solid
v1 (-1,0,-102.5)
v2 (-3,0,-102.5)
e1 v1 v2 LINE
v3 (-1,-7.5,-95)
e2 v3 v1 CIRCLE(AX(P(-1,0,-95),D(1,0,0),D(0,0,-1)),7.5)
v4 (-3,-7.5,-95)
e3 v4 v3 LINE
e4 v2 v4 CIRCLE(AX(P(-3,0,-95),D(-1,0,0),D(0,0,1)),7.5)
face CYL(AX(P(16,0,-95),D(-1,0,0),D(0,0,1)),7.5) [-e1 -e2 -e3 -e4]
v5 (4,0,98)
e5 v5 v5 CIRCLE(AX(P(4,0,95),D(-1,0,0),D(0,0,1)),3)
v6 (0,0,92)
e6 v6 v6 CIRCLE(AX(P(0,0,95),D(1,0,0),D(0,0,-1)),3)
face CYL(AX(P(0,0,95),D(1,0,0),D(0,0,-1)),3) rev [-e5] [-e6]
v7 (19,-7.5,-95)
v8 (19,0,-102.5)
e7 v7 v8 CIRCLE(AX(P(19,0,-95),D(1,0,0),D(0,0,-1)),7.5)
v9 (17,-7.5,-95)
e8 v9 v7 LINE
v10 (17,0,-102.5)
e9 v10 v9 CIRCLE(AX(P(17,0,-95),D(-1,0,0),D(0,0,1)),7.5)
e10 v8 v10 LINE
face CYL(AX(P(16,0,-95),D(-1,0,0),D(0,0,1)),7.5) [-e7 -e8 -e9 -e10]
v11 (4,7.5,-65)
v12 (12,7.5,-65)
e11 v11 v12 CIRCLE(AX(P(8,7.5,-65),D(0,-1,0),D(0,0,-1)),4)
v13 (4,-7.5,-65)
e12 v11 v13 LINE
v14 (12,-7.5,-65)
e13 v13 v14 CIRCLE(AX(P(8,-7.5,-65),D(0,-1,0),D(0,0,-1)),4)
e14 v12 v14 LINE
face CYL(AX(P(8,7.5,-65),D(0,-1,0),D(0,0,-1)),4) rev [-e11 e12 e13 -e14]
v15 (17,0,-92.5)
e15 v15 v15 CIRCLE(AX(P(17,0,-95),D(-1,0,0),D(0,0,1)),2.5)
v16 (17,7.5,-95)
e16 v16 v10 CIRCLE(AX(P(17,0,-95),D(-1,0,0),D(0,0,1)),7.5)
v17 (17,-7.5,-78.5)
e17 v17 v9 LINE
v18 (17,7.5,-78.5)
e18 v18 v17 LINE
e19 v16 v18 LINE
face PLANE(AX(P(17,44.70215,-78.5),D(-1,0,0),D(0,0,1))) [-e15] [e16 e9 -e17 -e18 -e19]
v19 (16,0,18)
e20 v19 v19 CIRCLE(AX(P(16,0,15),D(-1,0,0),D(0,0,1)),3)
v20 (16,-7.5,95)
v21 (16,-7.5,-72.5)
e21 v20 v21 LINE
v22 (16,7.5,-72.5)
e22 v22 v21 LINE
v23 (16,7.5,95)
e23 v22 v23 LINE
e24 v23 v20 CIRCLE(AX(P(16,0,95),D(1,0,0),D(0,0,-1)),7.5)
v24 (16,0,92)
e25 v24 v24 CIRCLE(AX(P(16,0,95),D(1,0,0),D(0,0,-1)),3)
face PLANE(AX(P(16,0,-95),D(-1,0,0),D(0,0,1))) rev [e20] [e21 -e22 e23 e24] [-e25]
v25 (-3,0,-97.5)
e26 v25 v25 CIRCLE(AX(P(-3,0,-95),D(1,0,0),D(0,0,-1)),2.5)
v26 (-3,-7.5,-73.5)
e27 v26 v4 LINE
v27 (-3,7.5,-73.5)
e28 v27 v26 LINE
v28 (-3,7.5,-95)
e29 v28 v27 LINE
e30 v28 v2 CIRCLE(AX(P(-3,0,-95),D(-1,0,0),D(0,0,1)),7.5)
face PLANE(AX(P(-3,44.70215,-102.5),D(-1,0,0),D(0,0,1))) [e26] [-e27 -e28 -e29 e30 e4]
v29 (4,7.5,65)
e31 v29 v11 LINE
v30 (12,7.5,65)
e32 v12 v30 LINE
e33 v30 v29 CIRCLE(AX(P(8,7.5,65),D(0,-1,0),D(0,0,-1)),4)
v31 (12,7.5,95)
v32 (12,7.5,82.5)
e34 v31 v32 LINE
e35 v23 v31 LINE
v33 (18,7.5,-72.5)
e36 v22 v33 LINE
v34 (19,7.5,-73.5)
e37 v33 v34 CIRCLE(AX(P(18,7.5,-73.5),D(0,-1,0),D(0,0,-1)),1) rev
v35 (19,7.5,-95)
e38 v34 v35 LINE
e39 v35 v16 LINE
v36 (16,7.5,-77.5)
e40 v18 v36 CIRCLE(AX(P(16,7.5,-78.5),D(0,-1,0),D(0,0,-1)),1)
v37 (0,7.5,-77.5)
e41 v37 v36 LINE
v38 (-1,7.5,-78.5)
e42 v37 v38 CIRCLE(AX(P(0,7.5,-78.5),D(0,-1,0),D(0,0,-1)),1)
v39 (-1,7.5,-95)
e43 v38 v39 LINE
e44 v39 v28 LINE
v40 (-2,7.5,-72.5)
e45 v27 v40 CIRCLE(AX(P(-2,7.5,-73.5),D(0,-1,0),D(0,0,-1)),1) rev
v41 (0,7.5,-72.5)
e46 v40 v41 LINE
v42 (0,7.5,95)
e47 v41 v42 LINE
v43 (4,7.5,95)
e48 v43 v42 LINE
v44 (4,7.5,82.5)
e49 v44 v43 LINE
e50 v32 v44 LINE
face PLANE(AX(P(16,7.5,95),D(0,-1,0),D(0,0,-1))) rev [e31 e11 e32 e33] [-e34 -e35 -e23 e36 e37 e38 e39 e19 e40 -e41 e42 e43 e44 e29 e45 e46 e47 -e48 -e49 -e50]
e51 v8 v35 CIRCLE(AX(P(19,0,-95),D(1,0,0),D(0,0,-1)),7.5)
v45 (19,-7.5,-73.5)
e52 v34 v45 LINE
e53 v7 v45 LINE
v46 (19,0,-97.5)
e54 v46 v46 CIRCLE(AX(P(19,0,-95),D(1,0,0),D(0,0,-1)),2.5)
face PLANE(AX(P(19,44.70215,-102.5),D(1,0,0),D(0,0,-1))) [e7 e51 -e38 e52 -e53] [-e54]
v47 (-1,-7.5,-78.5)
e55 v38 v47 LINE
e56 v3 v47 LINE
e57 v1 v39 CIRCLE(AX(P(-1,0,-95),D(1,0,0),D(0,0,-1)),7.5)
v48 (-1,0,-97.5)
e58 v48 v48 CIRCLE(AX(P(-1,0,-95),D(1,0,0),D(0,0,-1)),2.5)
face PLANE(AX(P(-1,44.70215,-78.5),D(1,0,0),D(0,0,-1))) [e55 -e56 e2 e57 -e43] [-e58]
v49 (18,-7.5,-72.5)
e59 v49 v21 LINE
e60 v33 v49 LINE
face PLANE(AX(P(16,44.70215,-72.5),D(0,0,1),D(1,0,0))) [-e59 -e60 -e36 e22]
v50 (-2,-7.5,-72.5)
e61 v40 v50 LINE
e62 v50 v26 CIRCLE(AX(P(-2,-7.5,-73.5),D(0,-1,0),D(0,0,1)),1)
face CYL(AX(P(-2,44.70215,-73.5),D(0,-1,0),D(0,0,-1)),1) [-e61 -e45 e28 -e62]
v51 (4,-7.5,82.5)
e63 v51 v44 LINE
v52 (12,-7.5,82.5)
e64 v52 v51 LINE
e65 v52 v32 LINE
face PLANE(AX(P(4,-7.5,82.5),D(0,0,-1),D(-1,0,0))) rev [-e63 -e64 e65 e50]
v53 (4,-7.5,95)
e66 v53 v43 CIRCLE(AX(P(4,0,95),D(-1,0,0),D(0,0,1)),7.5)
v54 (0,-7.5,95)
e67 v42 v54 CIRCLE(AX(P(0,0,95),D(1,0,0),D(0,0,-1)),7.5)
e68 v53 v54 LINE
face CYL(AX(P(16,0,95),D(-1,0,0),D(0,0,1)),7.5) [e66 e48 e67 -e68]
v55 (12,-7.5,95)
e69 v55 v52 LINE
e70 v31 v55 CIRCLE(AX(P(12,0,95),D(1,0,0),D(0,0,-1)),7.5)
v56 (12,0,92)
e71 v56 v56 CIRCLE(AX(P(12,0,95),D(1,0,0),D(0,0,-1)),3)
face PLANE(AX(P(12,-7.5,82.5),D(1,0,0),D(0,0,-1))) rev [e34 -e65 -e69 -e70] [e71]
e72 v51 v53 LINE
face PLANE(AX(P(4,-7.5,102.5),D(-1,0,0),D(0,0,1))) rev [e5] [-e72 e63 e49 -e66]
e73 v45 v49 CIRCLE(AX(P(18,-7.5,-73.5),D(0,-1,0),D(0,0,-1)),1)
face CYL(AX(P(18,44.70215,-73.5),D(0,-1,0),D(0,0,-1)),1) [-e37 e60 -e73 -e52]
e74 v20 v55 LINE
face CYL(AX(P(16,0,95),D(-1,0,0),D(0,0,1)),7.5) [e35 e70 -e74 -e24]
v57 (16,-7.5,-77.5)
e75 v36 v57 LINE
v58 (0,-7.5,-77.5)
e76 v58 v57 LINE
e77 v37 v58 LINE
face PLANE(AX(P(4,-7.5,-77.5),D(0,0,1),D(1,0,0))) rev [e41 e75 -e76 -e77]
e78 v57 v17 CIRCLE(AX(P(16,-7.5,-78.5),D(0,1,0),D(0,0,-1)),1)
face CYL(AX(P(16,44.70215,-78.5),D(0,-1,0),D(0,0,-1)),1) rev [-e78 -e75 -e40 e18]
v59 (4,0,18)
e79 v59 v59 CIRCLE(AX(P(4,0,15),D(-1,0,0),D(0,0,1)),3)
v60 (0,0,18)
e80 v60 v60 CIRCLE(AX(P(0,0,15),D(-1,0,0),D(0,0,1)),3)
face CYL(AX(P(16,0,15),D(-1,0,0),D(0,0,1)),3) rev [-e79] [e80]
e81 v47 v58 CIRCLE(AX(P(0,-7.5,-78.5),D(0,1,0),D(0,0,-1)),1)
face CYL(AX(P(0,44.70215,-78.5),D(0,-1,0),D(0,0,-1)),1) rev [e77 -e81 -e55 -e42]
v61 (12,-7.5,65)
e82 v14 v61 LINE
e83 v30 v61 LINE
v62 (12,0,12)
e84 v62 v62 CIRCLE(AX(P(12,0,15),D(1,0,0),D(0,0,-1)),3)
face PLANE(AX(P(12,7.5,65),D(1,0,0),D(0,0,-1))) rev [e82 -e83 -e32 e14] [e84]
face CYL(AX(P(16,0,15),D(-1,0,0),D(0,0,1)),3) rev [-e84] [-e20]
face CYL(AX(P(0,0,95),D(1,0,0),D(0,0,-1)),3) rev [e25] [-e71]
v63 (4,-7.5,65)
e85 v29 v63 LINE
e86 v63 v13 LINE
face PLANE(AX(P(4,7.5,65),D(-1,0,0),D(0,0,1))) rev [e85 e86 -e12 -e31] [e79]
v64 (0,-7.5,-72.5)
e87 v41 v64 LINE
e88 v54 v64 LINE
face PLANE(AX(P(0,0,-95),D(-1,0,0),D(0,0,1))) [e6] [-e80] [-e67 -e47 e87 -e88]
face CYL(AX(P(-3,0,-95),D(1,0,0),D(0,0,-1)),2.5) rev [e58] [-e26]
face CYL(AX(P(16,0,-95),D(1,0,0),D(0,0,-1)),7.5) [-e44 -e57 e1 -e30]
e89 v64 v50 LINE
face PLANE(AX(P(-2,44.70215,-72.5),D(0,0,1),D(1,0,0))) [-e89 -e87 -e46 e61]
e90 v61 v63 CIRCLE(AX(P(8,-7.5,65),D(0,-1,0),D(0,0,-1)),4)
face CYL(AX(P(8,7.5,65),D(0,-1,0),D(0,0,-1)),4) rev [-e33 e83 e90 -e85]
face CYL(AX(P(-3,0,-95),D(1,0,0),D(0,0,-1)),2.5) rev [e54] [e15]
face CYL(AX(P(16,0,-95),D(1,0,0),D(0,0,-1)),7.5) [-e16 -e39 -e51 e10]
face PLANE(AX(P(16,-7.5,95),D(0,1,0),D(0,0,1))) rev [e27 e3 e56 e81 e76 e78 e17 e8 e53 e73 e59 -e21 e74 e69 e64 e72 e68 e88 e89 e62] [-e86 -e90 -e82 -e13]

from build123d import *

# Parameters (mm, degrees)
EXTRUDE_1_DEPTH     = 16
SKETCH_3_W          = 8
SKETCH_3_H          = 20
SKETCH_3_H_2        = 25
CUT_EXTRUDE_1_DEPTH = 105.820083953
SKETCH_4_R          = 3
SKETCH_4_R_2        = 6
CUT_EXTRUDE_2_DEPTH = 105.012018536
CUT_EXTRUDE_3_DEPTH = 105.820083953
SKETCH_6_R          = 3
CUT_EXTRUDE_4_DEPTH = 105.012018536
EXTRUDE_2_DEPTH     = 15
CUT_EXTRUDE_START   = -15
CUT_EXTRUDE_5_DEPTH = 15
FILLET_1_R          = 7.5
SKETCH_9_R          = 2.5
CUT_EXTRUDE_6_DEPTH = 106.102331087


with BuildPart() as part:
    # 草图2 → 凸台-拉伸1 (new body)
    with BuildSketch(Plane(origin=(0, 0, 0), x_dir=(0, 0, -1), z_dir=(1, 0, 0))):
        with BuildLine():
            Line((-95, -7.5), (95, -7.5))
            ThreePointArc((95, -7.5), (102.5, 0), (95, 7.5))
            Line((95, 7.5), (-95, 7.5))
            ThreePointArc((-95, 7.5), (-102.5, 0), (-95, -7.5))
        make_face()
    extrude(amount=EXTRUDE_1_DEPTH)

    # 草图3 → 切除-拉伸1 (cut, through all)
    with BuildSketch(Plane(origin=(0, 7.5, 0), x_dir=(1, 0, 0), z_dir=(0, 1, 0))):
        with Locations((8, -92.5)):
            Rectangle(SKETCH_3_W, SKETCH_3_H)
        with Locations((8, 90)):
            Rectangle(SKETCH_3_W, SKETCH_3_H_2)
    extrude(amount=-CUT_EXTRUDE_1_DEPTH, mode=Mode.SUBTRACT)

    # 草图4 → 切除-拉伸2 (cut, through all)
    with BuildSketch(Plane(origin=(16, 0, 0), x_dir=(0, 0, -1), z_dir=(1, 0, 0))):
        with Locations((-95, 0)):
            Circle(SKETCH_4_R)
        with Locations((95, 0)):
            Circle(SKETCH_4_R_2)
    extrude(amount=-CUT_EXTRUDE_2_DEPTH, mode=Mode.SUBTRACT)

    # 草图5 → 切除-拉伸3 (cut, through all)
    with BuildSketch(Plane.XZ.offset(7.5)):
        with BuildLine():
            Line((12, 65), (12, -65))
            ThreePointArc((12, -65), (8, -69), (4, -65))
            Line((4, -65), (4, 65))
            ThreePointArc((4, 65), (8, 69), (12, 65))
        make_face()
    extrude(amount=-CUT_EXTRUDE_3_DEPTH, mode=Mode.SUBTRACT)

    # 草图6 → 切除-拉伸4 (cut, through all)
    with BuildSketch(Plane.ZY):
        with Locations((15, 0)):
            Circle(SKETCH_6_R)
    extrude(amount=-CUT_EXTRUDE_4_DEPTH, mode=Mode.SUBTRACT)

    # 草图7 → 凸台-拉伸2 (add)
    with BuildSketch(Plane.XZ.offset(7.5)):
        with BuildLine():
            Line((7.022963208, -77.5), (0, -77.5))
            ThreePointArc((0, -77.5), (-0.707106781, -77.792893219), (-1, -78.5))
            Line((-1, -78.5), (-1, -102.5))
            Line((-1, -102.5), (-3, -102.5))
            Line((-3, -102.5), (-3, -73.5))
            ThreePointArc((-3, -73.5), (-2.707106781, -72.792893219), (-2, -72.5))
            Line((-2, -72.5), (0, -72.5))
            Line((0, -72.5), (0, -76.537771908))
            Line((0, -76.537771908), (16, -76.537771908))
            Line((16, -76.537771908), (16, -72.5))
            Line((16, -72.5), (18, -72.5))
            ThreePointArc((18, -72.5), (18.707106781, -72.792893219), (19, -73.5))
            Line((19, -73.5), (19, -102.5))
            Line((19, -102.5), (17, -102.5))
            Line((17, -102.5), (17, -78.5))
            ThreePointArc((17, -78.5), (16.707106781, -77.792893219), (16, -77.5))
            Line((16, -77.5), (8.977036792, -77.5))
            Line((8.977036792, -77.5), (7.022963208, -77.5))
        make_face()
    extrude(amount=-EXTRUDE_2_DEPTH)

    # 草图8 → 切除-拉伸5 (cut)
    with BuildSketch(Plane(origin=(0, -7.5, 0), x_dir=(-1, 0, 0), z_dir=(0, -1, 0)).offset(CUT_EXTRUDE_START)):
        with BuildLine():
            Line((-17, 102.5), (1, 102.5))
            Line((1, 102.5), (1, 78.5))
            ThreePointArc((1, 78.5), (0.707106781, 77.792893219), (0, 77.5))
            Line((0, 77.5), (-16, 77.5))
            ThreePointArc((-16, 77.5), (-16.707106781, 77.792893219), (-17, 78.5))
            Line((-17, 78.5), (-17, 102.5))
        make_face()
    extrude(amount=CUT_EXTRUDE_5_DEPTH, mode=Mode.SUBTRACT)

    # 圆角1
    fillet_1_edges = [part.edges().sort_by_distance(p)[0] for p in [
        (18, 7.5, -102.5),
        (18, -7.5, -102.5),
        (-2, 7.5, -102.5),
        (-2, -7.5, -102.5),
    ]]
    fillet(fillet_1_edges, radius=FILLET_1_R - 0.0001)  # a hair under: the kernel refuses the full size

    # 草图9 → 切除-拉伸6 (cut, through all)
    with BuildSketch(Plane(origin=(19, 0, 0), x_dir=(0, 0, -1), z_dir=(1, 0, 0))):
        with Locations((95, 0)):
            Circle(SKETCH_9_R)
    extrude(amount=-CUT_EXTRUDE_6_DEPTH, mode=Mode.SUBTRACT)


solid = part.part
